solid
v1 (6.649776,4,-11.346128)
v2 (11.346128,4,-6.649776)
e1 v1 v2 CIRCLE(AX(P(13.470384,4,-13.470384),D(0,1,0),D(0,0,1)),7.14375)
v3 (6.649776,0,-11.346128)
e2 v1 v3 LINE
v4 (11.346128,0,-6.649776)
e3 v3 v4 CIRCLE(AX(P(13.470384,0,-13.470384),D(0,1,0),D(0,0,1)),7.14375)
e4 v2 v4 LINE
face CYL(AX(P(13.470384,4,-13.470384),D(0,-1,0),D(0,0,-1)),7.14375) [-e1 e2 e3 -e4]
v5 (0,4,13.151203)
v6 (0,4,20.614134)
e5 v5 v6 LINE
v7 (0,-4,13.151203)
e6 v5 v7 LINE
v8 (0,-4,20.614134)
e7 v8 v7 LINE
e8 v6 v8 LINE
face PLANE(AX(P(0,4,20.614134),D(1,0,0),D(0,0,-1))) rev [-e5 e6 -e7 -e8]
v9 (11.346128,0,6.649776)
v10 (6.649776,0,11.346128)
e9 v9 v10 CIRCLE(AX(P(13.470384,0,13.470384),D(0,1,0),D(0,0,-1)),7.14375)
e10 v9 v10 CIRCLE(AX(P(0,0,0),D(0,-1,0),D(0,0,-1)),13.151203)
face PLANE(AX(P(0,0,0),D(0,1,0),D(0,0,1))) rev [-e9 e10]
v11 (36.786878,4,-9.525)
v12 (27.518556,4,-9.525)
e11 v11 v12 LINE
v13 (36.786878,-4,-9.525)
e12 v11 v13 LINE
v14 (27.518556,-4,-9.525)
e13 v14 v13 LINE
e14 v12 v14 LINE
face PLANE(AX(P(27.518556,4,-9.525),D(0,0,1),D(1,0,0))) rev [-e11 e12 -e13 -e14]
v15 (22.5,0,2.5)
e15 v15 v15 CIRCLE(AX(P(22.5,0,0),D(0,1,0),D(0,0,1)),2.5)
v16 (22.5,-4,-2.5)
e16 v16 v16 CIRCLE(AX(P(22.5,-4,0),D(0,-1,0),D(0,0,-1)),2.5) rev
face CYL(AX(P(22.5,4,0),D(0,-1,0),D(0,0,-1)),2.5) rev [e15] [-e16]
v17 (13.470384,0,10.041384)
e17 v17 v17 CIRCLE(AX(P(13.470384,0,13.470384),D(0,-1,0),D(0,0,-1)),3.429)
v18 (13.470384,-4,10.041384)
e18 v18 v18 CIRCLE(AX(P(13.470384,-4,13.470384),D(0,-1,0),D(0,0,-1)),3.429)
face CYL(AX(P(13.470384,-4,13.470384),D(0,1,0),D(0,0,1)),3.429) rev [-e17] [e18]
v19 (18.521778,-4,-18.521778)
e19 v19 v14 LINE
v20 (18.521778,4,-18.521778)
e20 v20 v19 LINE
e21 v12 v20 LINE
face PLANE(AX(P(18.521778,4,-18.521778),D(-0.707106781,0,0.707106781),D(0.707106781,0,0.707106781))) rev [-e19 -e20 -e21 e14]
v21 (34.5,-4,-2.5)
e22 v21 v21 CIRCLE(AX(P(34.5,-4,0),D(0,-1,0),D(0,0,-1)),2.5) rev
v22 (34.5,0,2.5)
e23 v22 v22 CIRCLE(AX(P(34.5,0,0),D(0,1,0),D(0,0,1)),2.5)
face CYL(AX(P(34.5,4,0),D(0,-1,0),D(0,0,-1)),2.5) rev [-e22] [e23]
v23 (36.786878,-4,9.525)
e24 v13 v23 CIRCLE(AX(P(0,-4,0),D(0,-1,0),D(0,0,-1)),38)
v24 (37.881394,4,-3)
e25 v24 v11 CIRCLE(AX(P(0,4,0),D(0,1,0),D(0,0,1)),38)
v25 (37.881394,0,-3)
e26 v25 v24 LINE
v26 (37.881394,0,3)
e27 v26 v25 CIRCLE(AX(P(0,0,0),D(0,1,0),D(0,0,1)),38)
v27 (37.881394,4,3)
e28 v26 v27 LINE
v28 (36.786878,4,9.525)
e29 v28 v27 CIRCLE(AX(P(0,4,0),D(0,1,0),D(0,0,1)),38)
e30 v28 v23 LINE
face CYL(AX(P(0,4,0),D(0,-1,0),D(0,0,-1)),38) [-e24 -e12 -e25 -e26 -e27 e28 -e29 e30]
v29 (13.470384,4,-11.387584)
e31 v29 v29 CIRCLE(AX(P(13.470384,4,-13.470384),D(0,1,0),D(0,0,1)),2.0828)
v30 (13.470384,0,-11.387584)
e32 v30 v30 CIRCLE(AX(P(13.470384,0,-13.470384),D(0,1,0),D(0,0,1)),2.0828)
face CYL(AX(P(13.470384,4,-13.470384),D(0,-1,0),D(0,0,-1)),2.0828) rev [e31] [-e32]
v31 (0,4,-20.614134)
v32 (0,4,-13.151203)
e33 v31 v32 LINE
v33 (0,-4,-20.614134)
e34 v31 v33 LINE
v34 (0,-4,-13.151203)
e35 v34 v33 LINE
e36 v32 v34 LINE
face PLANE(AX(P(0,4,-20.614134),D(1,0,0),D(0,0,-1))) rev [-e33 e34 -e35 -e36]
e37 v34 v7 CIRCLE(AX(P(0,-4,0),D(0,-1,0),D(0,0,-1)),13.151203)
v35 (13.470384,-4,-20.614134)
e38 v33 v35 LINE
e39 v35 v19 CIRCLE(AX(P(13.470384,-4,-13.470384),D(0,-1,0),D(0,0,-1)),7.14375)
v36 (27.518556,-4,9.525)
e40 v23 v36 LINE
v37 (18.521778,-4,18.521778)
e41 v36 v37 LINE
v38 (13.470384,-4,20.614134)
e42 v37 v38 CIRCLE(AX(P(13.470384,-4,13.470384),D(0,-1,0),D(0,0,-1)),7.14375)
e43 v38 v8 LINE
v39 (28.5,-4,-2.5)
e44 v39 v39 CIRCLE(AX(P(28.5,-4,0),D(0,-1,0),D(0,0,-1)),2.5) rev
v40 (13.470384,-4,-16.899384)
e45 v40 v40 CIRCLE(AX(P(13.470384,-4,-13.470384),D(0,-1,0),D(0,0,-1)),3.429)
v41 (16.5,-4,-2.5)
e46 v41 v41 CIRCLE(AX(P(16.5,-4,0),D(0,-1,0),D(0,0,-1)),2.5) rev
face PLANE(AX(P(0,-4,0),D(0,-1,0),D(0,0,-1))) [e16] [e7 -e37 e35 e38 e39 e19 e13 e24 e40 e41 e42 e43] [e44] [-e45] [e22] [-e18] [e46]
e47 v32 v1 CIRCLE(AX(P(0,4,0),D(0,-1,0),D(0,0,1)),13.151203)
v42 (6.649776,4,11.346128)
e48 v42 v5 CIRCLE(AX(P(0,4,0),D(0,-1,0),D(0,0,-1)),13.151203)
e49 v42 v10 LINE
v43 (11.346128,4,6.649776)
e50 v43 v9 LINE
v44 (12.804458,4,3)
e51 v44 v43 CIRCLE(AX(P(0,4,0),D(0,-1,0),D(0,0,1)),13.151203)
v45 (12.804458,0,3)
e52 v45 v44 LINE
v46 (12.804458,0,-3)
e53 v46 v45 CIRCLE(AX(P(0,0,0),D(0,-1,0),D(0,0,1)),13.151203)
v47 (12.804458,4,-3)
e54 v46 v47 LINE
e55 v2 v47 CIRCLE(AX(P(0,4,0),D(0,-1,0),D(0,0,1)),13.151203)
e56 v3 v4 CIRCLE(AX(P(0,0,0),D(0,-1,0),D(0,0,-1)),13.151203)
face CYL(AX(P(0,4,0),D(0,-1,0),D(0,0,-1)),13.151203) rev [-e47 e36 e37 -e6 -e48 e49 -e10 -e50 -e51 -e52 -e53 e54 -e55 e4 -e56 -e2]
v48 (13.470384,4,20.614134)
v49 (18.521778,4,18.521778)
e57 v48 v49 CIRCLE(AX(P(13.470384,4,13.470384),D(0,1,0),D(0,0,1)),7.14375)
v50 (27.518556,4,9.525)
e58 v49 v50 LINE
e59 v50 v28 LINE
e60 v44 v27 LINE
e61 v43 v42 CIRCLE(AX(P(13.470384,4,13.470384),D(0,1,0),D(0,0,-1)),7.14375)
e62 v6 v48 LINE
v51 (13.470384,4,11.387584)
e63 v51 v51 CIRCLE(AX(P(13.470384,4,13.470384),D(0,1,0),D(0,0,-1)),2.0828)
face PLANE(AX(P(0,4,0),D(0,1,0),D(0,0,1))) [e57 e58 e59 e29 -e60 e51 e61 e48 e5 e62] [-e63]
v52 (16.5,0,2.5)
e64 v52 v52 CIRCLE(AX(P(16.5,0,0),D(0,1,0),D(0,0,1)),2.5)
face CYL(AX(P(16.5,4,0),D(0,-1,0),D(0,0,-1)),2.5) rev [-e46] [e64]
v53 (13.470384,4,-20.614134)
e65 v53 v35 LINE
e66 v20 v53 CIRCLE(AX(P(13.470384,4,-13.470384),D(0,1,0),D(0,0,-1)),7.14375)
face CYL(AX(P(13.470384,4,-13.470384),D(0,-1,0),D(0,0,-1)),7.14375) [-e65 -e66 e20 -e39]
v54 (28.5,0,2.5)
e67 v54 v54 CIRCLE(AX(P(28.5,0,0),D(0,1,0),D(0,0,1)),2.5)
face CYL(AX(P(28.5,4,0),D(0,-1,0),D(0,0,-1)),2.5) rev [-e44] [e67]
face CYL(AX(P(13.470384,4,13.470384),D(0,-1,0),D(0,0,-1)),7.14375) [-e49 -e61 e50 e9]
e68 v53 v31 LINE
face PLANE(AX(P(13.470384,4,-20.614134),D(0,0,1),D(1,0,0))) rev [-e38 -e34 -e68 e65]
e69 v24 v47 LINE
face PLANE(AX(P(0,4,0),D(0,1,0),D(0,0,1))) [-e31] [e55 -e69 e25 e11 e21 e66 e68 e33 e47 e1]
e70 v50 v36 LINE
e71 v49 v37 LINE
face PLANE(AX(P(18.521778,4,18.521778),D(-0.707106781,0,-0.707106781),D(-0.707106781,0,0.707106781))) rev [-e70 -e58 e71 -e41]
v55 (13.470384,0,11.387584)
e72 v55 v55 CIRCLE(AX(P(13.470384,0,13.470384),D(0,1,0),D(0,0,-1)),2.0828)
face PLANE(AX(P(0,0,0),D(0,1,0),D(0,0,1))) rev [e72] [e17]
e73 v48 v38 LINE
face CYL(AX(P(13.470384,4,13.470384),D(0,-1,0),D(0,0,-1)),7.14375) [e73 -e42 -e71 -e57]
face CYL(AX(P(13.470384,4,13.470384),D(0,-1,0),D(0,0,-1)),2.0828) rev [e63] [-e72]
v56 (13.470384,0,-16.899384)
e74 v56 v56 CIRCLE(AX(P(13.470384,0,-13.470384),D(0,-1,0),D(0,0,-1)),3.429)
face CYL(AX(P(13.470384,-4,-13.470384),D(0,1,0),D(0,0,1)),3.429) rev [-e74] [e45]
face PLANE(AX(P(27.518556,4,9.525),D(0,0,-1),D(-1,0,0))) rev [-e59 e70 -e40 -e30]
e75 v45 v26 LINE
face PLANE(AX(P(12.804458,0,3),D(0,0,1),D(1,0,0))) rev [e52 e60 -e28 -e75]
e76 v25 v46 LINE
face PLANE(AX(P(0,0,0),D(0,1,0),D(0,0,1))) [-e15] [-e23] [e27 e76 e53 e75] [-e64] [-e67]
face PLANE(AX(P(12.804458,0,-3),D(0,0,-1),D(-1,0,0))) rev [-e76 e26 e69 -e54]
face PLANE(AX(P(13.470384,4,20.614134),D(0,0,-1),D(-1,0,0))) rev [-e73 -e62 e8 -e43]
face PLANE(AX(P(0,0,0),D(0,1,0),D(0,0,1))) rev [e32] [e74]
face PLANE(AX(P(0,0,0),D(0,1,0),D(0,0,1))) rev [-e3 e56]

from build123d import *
from build123d.topology import SkipClean

# Parameters (mm, degrees)
SKETCH1_R           = 2.0828
SKETCH1_R_2         = 2.5
BOSS_EXTRUDE2_DEPTH = 4
BOSS_EXTRUDE3_START = 4
SKETCH5_R           = 3.429
SKETCH5_R_2         = 2.5
BOSS_EXTRUDE3_DEPTH = 4
CUT_EXTRUDE2_START  = -4
CUT_EXTRUDE2_DEPTH  = 4


with BuildPart() as part:
    # Sketch1 → Boss-Extrude2 (new body)
    with BuildSketch(Plane(origin=(0, 0, 0), x_dir=(1, 0, 0), z_dir=(0, 1, 0))):
        with BuildLine():
            Line((0, 20.614134159), (0, 13.151202806))
            ThreePointArc((0, 13.151202806), (3.445207277, 12.691914043), (6.64977573, 11.346127885))
            ThreePointArc((6.64977573, 11.346127885), (8.418990091, 8.418990091), (11.346127885, 6.64977573))
            ThreePointArc((11.346127885, 6.64977573), (13.151202806, 0), (11.346127885, -6.64977573))
            ThreePointArc((11.346127885, -6.64977573), (8.418990091, -8.418990091), (6.64977573, -11.346127885))
            ThreePointArc((6.64977573, -11.346127885), (3.445207277, -12.691914043), (0, -13.151202806))
            Line((0, -13.151202806), (0, -20.614134159))
            Line((0, -20.614134159), (13.470384159, -20.614134159))
            ThreePointArc((13.470384159, -20.614134159), (16.204178929, -20.070348569), (18.521778227, -18.521778227))
            Line((18.521778227, -18.521778227), (27.518556454, -9.525))
            Line((27.518556454, -9.525), (36.786877756, -9.525))
            ThreePointArc((36.786877756, -9.525), (38, 0), (36.786877756, 9.525))
            Line((36.786877756, 9.525), (27.518556454, 9.525))
            Line((27.518556454, 9.525), (18.521778227, 18.521778227))
            ThreePointArc((18.521778227, 18.521778227), (16.204178929, 20.070348569), (13.470384159, 20.614134159))
            Line((13.470384159, 20.614134159), (0, 20.614134159))
        make_face()
        with Locations((13.470384159, 13.470384159)):
            Circle(SKETCH1_R, mode=Mode.SUBTRACT)
        with Locations((13.470384159, -13.470384159)):
            Circle(SKETCH1_R, mode=Mode.SUBTRACT)
        with Locations((16.5, 0)):
            Circle(SKETCH1_R_2, mode=Mode.SUBTRACT)
        with Locations((22.5, 0)):
            Circle(SKETCH1_R_2, mode=Mode.SUBTRACT)
        with Locations((28.5, 0)):
            Circle(SKETCH1_R_2, mode=Mode.SUBTRACT)
        with Locations((34.5, 0)):
            Circle(SKETCH1_R_2, mode=Mode.SUBTRACT)
    extrude(amount=BOSS_EXTRUDE2_DEPTH)

    # Sketch5 → Boss-Extrude3 (add)
    with SkipClean():  # the faces are left unmerged after this step: merging them gives an invalid solid
        with BuildSketch(Plane.XZ.offset(BOSS_EXTRUDE3_START)):
            with BuildLine():
                ThreePointArc((36.786877756, -9.525), (38, 0), (36.786877756, 9.525))
                Line((36.786877756, 9.525), (27.518556454, 9.525))
                Line((27.518556454, 9.525), (18.521778227, 18.521778227))
                ThreePointArc((18.521778227, 18.521778227), (16.204178929, 20.070348569), (13.470384159, 20.614134159))
                Line((13.470384159, 20.614134159), (0, 20.614134159))
                Line((0, 20.614134159), (0, 13.151202806))
                ThreePointArc((0, 13.151202806), (3.445207277, 12.691914043), (6.64977573, 11.346127885))
                ThreePointArc((6.64977573, 11.346127885), (9.299304685, 9.299304685), (11.346127885, 6.64977573))
                ThreePointArc((11.346127885, 6.64977573), (13.151202806, 0), (11.346127885, -6.64977573))
                ThreePointArc((11.346127885, -6.64977573), (9.299304685, -9.299304685), (6.64977573, -11.346127885))
                ThreePointArc((6.64977573, -11.346127885), (3.445207277, -12.691914043), (0, -13.151202806))
                Line((0, -13.151202806), (0, -20.614134159))
                Line((0, -20.614134159), (13.470384159, -20.614134159))
                ThreePointArc((13.470384159, -20.614134159), (16.204178929, -20.070348569), (18.521778227, -18.521778227))
                Line((18.521778227, -18.521778227), (27.518556454, -9.525))
                Line((27.518556454, -9.525), (36.786877756, -9.525))
            make_face()
            with Locations((13.470384159, -13.470384159)):
                Circle(SKETCH5_R, mode=Mode.SUBTRACT)
            with Locations((16.5, 0)):
                Circle(SKETCH5_R_2, mode=Mode.SUBTRACT)
            with Locations((13.470384159, 13.470384159)):
                Circle(SKETCH5_R, mode=Mode.SUBTRACT)
            with BuildLine():
                ThreePointArc((25, 0), (22.5, -2.5), (20, 0))
                ThreePointArc((20, 0), (22.5, 2.5), (25, 0))
            make_face(mode=Mode.SUBTRACT)
            with BuildLine():
                ThreePointArc((31, 0), (28.5, -2.5), (26, 0))
                ThreePointArc((26, 0), (28.5, 2.5), (31, 0))
            make_face(mode=Mode.SUBTRACT)
            with BuildLine():
                ThreePointArc((37, 0), (34.5, -2.5), (32, 0))
                ThreePointArc((32, 0), (34.5, 2.5), (37, 0))
            make_face(mode=Mode.SUBTRACT)
        extrude(amount=-BOSS_EXTRUDE3_DEPTH)

    # Sketch6 → Cut-Extrude2 (cut)
    with SkipClean():  # the faces are left unmerged after this step: merging them gives an invalid solid
        with BuildSketch(Plane(origin=(0, 4, 0), x_dir=(1, 0, 0), z_dir=(0, 1, 0)).offset(CUT_EXTRUDE2_START)):
            with BuildLine():
                Line((12.804457632, -3), (37.88139385, -3))
                ThreePointArc((37.88139385, -3), (38, 0), (37.88139385, 3))
                Line((37.88139385, 3), (12.804457632, 3))
                ThreePointArc((12.804457632, 3), (13.151202806, 0), (12.804457632, -3))
            make_face()
        extrude(amount=CUT_EXTRUDE2_DEPTH, mode=Mode.SUBTRACT)


solid = part.part
